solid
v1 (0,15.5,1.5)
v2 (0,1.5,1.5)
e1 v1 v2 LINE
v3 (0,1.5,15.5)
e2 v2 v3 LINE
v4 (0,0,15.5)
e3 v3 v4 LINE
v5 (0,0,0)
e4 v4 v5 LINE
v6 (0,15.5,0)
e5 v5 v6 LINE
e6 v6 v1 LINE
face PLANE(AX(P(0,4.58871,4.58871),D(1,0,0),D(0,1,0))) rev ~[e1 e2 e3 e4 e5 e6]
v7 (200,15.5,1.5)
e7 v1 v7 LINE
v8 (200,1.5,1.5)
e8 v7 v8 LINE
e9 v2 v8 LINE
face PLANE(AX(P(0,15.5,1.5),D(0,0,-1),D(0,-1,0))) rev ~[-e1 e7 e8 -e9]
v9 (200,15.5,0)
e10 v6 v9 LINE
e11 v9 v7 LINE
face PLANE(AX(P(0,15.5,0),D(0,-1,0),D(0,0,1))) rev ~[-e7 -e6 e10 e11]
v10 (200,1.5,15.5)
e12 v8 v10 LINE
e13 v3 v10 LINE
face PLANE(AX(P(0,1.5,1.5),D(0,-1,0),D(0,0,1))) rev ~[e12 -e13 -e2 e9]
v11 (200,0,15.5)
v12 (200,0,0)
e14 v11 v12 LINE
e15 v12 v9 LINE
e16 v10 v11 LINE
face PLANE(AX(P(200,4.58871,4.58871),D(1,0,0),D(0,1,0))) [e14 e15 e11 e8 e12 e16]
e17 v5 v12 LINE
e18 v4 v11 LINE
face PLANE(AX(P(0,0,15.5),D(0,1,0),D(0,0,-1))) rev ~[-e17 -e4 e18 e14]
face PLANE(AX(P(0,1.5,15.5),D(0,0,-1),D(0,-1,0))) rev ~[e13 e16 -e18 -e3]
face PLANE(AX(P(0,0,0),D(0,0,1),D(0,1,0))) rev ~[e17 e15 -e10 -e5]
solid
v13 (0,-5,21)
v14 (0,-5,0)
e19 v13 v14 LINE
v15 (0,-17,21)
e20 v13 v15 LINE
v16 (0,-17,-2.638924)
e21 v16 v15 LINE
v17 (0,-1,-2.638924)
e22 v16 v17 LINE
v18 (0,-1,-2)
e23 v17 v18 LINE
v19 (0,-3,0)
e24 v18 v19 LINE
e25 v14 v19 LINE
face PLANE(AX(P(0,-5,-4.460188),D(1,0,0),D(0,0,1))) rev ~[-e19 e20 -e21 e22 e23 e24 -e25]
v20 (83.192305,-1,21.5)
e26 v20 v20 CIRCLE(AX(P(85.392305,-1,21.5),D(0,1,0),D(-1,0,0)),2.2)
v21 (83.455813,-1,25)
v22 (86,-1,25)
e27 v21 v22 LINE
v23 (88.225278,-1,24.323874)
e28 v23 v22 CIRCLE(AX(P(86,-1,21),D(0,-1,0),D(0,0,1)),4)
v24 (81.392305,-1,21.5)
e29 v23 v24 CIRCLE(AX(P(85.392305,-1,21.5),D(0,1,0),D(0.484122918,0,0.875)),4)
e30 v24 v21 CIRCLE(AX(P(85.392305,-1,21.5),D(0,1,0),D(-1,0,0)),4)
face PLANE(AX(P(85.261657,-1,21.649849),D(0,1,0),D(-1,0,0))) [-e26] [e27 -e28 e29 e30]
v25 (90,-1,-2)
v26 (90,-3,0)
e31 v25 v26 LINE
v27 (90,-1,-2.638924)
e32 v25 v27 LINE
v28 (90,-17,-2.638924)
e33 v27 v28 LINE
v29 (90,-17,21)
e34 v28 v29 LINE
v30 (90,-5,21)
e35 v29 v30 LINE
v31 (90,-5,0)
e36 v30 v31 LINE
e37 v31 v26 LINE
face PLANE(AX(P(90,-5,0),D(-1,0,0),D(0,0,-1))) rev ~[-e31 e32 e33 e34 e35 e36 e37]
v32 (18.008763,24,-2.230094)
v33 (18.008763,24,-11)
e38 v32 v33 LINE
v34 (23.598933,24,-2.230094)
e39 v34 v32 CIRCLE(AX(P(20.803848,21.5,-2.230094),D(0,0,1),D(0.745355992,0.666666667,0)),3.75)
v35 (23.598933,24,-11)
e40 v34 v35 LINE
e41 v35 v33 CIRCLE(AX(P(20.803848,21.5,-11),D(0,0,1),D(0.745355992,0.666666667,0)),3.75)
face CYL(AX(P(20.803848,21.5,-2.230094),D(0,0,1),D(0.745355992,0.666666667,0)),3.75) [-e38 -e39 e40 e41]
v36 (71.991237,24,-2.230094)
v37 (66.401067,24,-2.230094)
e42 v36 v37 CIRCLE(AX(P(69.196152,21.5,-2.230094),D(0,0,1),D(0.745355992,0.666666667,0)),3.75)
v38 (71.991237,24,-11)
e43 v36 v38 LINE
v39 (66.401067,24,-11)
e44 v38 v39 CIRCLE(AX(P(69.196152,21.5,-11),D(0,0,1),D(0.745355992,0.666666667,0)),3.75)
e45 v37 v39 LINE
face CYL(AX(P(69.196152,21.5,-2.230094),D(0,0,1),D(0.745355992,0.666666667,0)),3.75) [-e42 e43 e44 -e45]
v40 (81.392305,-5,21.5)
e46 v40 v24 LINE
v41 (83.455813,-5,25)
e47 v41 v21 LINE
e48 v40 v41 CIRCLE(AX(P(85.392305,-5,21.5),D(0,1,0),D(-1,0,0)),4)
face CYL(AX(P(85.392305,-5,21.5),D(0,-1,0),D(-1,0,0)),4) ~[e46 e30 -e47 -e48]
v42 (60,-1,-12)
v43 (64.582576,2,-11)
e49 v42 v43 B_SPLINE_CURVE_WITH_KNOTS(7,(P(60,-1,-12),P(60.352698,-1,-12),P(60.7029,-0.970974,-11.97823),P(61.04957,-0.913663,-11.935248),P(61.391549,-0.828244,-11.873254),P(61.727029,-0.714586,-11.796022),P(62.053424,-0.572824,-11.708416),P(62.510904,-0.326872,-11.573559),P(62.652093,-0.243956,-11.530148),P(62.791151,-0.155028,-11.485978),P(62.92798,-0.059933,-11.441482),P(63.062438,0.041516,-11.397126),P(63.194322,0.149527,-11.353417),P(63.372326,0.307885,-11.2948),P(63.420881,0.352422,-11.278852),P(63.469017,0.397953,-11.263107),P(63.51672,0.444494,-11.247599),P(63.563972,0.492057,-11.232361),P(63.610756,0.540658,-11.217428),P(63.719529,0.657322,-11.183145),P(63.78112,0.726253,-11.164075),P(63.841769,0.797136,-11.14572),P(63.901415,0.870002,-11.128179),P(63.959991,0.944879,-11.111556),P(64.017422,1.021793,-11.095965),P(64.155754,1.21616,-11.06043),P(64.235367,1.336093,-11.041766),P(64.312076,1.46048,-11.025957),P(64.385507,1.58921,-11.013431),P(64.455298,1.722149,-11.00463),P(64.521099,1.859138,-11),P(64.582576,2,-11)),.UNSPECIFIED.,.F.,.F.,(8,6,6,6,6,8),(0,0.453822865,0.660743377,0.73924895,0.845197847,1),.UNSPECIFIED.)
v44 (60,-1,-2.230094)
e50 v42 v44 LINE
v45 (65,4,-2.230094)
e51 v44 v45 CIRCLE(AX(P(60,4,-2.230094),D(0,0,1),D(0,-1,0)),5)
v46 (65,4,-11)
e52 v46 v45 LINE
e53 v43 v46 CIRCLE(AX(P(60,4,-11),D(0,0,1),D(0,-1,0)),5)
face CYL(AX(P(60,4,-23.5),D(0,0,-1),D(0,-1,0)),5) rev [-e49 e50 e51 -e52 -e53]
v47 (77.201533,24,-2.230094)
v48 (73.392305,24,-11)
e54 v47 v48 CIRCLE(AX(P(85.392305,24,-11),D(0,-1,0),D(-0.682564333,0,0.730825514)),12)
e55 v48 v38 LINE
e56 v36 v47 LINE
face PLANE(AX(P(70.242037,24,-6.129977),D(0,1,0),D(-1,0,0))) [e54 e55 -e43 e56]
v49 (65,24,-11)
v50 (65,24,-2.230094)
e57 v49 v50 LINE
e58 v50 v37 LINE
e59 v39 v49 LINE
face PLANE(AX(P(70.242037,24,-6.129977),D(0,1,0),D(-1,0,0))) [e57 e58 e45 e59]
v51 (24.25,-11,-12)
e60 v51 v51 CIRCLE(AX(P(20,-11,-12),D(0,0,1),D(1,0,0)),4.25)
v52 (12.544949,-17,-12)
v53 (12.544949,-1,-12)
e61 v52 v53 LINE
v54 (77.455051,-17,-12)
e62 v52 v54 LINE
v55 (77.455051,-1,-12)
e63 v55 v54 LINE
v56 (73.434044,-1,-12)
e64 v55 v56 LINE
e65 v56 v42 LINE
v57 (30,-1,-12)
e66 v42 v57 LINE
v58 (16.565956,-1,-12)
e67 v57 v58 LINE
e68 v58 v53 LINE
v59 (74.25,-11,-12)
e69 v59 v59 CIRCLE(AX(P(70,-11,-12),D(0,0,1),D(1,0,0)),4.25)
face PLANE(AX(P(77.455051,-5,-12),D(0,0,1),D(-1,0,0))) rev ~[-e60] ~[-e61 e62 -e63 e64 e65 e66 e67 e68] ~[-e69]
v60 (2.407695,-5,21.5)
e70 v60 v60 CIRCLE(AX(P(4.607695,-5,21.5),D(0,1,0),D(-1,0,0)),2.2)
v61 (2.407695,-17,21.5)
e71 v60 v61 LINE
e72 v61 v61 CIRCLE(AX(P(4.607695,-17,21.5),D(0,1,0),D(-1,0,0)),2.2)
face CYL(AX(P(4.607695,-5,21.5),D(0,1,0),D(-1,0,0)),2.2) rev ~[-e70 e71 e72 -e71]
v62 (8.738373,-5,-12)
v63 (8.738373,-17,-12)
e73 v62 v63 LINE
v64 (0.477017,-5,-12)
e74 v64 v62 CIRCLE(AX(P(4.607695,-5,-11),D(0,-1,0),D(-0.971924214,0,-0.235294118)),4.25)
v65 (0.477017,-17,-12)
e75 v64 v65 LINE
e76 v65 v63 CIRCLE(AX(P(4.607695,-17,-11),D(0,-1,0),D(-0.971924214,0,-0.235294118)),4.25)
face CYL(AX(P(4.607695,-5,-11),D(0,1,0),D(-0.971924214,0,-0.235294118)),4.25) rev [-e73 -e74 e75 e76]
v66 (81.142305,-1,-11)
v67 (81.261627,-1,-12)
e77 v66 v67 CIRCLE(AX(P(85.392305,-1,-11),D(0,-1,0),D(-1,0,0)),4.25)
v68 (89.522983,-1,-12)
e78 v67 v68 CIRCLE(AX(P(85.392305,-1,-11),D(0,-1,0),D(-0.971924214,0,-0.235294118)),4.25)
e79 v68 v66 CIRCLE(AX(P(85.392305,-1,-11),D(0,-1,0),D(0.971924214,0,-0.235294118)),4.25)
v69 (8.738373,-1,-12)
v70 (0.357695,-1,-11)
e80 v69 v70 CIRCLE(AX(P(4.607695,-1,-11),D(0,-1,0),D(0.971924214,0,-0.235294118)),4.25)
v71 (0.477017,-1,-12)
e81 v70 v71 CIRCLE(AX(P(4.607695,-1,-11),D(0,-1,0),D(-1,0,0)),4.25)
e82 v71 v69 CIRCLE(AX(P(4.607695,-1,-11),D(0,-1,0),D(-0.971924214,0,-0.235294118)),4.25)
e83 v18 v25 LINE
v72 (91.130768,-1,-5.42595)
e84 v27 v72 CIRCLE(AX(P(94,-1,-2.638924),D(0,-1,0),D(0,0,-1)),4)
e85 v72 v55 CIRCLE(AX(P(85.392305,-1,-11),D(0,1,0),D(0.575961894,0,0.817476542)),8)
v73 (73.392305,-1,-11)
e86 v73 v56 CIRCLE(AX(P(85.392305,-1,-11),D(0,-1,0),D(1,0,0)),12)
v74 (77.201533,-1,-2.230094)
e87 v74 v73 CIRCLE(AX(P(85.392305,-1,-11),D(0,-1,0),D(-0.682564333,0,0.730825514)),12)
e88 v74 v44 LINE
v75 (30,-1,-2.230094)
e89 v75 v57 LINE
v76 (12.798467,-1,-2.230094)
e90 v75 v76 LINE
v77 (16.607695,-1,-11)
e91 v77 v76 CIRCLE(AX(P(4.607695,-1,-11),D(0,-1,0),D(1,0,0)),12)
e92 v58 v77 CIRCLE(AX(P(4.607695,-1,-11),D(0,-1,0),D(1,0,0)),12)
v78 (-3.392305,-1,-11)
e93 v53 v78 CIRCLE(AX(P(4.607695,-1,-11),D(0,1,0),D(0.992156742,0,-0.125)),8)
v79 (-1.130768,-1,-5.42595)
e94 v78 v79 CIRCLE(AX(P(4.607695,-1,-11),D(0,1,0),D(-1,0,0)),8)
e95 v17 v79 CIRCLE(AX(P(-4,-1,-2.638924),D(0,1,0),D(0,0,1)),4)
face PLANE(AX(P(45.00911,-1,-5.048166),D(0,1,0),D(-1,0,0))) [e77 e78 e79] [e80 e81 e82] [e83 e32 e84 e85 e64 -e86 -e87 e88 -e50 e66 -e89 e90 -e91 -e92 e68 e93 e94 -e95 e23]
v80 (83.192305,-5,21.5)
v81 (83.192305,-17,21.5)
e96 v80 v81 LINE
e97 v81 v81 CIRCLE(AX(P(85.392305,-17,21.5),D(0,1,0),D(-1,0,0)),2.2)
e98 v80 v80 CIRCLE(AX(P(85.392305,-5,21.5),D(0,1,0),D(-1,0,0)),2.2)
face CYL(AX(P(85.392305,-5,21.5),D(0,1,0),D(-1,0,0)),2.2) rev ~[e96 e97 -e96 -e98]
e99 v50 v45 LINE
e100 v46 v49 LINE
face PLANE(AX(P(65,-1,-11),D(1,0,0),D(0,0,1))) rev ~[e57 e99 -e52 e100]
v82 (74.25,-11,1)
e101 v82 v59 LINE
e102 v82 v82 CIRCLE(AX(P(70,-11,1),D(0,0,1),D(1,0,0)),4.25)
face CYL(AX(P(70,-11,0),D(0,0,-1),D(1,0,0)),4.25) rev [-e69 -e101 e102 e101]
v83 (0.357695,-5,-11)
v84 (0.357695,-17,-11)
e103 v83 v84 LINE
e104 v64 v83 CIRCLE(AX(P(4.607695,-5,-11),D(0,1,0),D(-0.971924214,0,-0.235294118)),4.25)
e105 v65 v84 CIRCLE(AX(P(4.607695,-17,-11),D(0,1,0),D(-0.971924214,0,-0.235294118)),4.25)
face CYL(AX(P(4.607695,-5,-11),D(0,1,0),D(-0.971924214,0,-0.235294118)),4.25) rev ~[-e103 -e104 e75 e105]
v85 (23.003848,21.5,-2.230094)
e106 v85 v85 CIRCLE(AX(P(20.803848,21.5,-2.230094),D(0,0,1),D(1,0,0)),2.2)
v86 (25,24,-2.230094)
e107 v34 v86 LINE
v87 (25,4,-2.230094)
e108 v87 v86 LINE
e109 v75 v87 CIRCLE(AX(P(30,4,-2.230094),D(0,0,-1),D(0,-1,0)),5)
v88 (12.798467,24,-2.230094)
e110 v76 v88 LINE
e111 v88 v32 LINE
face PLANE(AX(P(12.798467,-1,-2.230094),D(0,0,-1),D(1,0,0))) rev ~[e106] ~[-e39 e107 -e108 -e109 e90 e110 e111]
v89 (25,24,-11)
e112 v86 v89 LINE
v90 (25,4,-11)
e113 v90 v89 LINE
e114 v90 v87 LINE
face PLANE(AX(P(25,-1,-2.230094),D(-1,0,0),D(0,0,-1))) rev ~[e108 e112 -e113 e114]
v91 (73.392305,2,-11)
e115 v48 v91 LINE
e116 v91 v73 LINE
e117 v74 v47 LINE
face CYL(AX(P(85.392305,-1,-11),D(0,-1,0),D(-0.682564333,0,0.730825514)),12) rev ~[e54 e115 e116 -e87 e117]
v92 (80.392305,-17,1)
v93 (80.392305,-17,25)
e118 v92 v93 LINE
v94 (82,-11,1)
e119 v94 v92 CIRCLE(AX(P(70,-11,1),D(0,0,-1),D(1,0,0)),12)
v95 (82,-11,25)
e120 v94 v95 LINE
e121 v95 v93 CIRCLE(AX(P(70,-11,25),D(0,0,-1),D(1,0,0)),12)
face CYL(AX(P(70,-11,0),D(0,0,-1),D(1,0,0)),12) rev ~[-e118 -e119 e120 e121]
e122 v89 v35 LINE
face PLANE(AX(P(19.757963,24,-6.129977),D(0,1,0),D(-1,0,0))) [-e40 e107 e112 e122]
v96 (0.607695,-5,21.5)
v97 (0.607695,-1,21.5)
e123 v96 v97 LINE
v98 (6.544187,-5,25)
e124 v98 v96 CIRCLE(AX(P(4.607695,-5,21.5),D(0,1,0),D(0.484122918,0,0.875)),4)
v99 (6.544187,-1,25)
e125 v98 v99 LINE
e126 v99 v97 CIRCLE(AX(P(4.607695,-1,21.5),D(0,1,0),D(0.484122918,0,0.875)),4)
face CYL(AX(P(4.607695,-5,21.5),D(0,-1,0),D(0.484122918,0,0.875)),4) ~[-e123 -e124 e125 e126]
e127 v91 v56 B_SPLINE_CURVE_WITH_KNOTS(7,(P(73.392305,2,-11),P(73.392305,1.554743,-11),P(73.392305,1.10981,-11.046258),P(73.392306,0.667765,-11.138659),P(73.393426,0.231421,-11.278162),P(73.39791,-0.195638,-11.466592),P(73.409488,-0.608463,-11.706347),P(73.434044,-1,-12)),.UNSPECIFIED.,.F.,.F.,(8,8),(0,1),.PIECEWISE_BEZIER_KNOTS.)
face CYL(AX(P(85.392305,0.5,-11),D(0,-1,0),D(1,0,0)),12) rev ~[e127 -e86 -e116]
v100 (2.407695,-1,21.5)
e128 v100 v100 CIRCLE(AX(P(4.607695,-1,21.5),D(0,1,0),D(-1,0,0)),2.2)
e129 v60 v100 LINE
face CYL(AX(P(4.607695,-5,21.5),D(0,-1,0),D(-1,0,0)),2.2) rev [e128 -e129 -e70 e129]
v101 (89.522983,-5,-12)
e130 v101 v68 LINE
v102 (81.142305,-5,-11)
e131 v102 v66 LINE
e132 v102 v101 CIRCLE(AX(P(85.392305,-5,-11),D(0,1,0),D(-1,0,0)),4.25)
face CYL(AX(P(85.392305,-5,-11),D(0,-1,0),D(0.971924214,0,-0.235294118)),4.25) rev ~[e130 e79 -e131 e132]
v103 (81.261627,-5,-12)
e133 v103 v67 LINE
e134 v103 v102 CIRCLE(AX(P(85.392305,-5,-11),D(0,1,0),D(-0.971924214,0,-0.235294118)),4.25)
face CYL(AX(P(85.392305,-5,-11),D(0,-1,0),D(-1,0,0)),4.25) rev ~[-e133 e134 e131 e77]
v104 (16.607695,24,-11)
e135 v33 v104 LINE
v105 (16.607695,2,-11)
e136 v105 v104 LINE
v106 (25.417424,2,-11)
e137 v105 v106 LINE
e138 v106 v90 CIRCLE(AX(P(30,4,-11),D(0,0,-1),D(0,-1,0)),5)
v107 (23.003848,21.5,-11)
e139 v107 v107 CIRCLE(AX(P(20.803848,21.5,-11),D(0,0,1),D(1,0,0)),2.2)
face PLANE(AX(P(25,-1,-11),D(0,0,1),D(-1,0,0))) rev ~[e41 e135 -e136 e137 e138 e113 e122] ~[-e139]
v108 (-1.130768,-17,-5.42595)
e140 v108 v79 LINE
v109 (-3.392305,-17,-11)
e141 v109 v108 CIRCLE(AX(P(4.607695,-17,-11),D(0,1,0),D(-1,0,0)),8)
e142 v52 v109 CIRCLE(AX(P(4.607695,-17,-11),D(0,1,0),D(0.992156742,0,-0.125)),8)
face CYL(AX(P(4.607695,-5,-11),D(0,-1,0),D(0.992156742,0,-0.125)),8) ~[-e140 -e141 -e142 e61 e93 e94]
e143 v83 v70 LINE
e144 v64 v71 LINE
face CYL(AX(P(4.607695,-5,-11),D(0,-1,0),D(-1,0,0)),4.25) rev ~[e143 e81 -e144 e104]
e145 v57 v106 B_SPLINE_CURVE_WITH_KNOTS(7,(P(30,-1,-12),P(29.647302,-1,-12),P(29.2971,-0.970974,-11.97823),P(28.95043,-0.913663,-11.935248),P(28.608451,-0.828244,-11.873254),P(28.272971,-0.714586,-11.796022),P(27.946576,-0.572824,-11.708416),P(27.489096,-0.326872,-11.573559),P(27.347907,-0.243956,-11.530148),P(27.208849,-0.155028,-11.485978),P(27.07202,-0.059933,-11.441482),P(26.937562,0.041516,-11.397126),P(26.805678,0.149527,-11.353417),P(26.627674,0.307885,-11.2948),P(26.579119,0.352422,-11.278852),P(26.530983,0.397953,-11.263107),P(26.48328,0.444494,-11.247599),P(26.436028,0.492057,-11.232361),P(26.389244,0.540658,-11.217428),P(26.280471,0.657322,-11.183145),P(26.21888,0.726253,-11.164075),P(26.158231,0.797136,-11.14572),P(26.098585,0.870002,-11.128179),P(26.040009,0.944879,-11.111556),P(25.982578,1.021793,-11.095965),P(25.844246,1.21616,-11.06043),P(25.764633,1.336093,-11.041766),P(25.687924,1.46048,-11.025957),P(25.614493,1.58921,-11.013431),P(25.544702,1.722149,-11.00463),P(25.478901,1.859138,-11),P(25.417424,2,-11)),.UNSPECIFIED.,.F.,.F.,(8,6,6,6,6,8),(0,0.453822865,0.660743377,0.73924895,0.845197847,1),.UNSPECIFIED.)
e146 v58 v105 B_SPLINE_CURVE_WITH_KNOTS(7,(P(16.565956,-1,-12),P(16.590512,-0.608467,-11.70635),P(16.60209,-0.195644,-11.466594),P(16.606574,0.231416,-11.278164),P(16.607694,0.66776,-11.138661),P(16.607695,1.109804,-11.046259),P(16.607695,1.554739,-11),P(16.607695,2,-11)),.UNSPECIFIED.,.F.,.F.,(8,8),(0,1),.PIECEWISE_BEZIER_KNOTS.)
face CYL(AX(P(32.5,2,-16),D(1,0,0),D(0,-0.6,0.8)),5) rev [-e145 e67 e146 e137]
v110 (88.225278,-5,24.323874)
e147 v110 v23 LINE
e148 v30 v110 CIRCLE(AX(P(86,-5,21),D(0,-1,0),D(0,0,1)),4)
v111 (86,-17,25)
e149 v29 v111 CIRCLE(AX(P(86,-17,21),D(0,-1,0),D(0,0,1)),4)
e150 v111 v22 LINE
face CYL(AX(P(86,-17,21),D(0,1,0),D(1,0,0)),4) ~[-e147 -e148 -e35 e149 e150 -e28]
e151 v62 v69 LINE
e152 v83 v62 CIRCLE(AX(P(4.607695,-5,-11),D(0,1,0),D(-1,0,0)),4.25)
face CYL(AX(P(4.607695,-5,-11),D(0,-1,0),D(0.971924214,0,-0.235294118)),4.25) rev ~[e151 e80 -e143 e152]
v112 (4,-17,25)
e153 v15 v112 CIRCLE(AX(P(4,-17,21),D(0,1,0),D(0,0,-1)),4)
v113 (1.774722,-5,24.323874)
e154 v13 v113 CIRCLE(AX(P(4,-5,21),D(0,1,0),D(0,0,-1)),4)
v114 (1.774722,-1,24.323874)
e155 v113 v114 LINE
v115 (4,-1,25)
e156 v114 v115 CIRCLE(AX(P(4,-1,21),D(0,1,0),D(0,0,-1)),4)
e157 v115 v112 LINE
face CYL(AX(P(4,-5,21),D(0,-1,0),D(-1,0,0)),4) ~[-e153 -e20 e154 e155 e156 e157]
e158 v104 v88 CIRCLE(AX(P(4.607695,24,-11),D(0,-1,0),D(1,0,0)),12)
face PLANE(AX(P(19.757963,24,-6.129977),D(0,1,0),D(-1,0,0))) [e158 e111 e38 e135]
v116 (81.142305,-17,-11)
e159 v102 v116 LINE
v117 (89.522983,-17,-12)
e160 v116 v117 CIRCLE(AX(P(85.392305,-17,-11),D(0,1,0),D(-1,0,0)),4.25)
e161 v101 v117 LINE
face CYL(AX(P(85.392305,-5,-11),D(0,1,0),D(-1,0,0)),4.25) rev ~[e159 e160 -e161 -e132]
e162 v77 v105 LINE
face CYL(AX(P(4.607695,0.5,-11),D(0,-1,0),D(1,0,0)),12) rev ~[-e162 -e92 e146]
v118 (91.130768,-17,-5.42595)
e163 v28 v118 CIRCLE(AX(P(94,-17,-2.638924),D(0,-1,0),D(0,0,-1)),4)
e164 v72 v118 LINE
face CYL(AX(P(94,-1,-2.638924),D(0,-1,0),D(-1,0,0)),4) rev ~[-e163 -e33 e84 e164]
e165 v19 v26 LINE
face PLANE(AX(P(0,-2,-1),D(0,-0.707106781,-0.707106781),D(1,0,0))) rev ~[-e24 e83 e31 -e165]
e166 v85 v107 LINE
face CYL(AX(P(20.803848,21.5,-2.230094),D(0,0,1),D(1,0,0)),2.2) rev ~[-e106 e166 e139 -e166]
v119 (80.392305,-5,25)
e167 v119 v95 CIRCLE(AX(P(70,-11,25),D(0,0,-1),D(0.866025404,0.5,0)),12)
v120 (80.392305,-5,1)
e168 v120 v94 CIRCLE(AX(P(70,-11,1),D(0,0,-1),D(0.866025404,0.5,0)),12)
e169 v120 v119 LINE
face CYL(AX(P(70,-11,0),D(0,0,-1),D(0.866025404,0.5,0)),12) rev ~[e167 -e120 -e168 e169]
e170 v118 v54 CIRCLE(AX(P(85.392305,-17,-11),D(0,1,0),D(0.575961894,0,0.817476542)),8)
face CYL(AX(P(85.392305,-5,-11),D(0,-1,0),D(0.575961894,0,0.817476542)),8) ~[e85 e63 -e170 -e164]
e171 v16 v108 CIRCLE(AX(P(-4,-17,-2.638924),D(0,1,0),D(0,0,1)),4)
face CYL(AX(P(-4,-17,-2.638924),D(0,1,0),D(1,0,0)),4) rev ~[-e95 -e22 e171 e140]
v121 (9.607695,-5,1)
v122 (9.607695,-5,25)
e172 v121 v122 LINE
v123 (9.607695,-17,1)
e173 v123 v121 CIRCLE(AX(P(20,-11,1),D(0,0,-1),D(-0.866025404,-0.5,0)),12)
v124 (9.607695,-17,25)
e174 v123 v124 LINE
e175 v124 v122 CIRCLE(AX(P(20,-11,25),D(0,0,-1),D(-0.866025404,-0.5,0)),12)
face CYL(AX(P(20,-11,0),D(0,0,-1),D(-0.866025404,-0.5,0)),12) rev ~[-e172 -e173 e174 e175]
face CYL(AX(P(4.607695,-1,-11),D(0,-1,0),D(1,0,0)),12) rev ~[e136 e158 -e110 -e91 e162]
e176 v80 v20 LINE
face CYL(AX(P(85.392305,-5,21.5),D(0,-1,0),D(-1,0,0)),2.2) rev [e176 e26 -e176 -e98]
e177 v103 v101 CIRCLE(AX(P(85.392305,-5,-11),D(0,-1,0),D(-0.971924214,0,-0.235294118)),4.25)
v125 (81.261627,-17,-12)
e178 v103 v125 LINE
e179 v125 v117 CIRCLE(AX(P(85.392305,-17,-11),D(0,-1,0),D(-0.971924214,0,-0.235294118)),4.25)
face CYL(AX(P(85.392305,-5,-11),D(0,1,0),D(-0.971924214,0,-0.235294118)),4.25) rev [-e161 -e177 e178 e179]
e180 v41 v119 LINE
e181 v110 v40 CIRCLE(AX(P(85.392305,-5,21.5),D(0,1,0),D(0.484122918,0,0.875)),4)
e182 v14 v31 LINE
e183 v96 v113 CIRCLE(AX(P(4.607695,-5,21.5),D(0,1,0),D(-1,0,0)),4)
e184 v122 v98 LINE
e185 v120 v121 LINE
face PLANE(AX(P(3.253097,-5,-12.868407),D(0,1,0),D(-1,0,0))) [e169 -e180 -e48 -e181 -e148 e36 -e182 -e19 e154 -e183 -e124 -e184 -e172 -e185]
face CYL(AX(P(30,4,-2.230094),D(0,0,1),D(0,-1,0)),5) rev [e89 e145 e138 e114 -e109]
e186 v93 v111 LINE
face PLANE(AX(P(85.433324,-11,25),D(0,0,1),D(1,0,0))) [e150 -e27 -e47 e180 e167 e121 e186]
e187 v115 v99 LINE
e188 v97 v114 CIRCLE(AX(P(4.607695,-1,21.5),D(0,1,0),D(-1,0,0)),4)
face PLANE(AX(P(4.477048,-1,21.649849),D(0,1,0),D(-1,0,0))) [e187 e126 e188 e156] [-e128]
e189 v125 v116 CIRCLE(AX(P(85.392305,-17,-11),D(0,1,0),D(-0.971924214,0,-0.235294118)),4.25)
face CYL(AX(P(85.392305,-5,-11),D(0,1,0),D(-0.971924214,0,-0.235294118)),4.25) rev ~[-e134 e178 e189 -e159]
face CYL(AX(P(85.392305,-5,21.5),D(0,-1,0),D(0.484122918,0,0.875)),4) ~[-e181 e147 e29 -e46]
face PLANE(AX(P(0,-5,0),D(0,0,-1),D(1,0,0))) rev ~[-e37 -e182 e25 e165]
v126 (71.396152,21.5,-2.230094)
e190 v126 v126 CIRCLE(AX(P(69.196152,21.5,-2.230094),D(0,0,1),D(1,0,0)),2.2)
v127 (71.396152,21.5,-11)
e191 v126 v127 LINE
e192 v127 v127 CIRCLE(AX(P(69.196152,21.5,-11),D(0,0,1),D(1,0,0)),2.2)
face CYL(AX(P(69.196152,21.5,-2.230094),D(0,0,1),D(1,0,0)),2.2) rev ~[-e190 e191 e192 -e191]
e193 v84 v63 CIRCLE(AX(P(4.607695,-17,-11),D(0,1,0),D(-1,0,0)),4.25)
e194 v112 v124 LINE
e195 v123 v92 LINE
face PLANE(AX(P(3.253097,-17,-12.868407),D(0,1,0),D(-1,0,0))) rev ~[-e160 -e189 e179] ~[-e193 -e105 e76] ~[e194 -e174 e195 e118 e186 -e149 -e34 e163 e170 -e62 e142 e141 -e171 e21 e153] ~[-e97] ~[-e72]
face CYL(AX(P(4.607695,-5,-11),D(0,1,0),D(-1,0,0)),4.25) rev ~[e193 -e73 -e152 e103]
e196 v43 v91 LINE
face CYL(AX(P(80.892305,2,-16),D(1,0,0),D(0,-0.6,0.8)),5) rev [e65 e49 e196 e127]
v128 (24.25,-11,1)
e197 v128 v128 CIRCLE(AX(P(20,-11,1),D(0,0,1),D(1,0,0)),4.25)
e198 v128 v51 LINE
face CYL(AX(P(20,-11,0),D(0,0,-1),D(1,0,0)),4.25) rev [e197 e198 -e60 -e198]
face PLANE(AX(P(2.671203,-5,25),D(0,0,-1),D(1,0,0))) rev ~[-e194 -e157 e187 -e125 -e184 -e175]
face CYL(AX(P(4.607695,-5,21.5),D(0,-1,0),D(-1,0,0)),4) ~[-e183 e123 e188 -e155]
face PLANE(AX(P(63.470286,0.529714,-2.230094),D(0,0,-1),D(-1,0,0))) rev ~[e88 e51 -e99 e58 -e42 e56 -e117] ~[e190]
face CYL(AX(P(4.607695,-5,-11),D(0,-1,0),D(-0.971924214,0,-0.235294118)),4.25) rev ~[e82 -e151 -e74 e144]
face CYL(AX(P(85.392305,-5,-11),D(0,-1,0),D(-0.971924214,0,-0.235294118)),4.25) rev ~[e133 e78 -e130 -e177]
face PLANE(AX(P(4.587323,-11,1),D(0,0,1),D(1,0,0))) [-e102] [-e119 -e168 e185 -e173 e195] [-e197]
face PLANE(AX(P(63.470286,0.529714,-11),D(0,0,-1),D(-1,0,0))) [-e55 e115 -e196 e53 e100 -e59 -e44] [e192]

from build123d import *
from build123d import SkipClean  # not in build123d's __all__

# Parameters (mm, degrees)
F1_DEPTH      = 200
F2_R          = 4.25
F3_DEPTH      = 12
F3_DEPTH_BACK = 1
F4_DEPTH      = 25
F5_R          = 2.2
F6_DEPTH      = 25
F7_DEPTH      = 4
F8_DEPTH      = 12
F9_DEPTH      = 25
F10_DEPTH     = 4
F12_DEPTH     = 25
F14_DEPTH     = 8.7699061669
F13_R         = 2.2
F15_DEPTH     = 25
F16_T1_DEPTH  = 8.7699061669
F16_T6_DEPTH  = 15.8923048454
F16_S7_R      = 12
F16_T8_DEPTH  = 10
F16_T12_DEPTH = 15.8923048454
F16_S13_R     = 12
F16_T14_DEPTH = 10
F16_T19_DEPTH = 23.3923048454
F16_T23_DEPTH = 21.2699061669
F16_T31_DEPTH = 21.2699061669
F16_T36_DEPTH = 23.3923048454
F17_SIZE      = 2
F18_R         = 4


# Not quite as in the source:
# - a fillet or chamfer that OpenCascade refuses, or shapes differently, is made with other operations: its cross-section is extruded or revolved along the edge and cut away or added


with BuildPart() as f1:
    # F0 (on Right) → F1 (new body)
    with BuildSketch(Plane.YZ):
        Polygon((0, 15.5), (0, 0), (15.5, 0), (15.5, 1.5), (1.5, 1.5), (1.5, 15.5), align=None)
    extrude(amount=F1_DEPTH)


with BuildPart() as f3:
    # F2 (on Top) → F3 (new body, two sides)
    with BuildSketch(Plane.XY) as f3_sk:
        with BuildLine():
            Line((9.6076951546, -5), (0, -5))
            Line((0, -5), (0, -17))
            Line((0, -17), (9.6076951546, -17))
            ThreePointArc((9.6076951546, -17), (8, -11), (9.6076951546, -5))
        make_face()
        with BuildLine():
            Line((59.6076951546, -5), (30.3923048454, -5))
            ThreePointArc((30.3923048454, -5), (31.5911099155, -7.8941714588), (32, -11))
            ThreePointArc((32, -11), (31.5911099155, -14.1058285412), (30.3923048454, -17))
            Line((30.3923048454, -17), (59.6076951546, -17))
            ThreePointArc((59.6076951546, -17), (58, -11), (59.6076951546, -5))
        make_face()
        with BuildLine():
            Line((90, -5), (80.3923048454, -5))
            ThreePointArc((80.3923048454, -5), (81.5911099155, -7.8941714588), (82, -11))
            ThreePointArc((82, -11), (81.5911099155, -14.1058285412), (80.3923048454, -17))
            Line((80.3923048454, -17), (90, -17))
            Line((90, -17), (90, -5))
        make_face()
        with BuildLine():
            Line((30.3923048454, -5), (9.6076951546, -5))
            ThreePointArc((9.6076951546, -5), (8, -11), (9.6076951546, -17))
            Line((9.6076951546, -17), (30.3923048454, -17))
            ThreePointArc((30.3923048454, -17), (31.5911099155, -14.1058285412), (32, -11))
            ThreePointArc((32, -11), (31.5911099155, -7.8941714588), (30.3923048454, -5))
        make_face()
        with Locations((20, -11)):
            Circle(F2_R, mode=Mode.SUBTRACT)
        with BuildLine():
            Line((80.3923048454, -5), (59.6076951546, -5))
            ThreePointArc((59.6076951546, -5), (58, -11), (59.6076951546, -17))
            Line((59.6076951546, -17), (80.3923048454, -17))
            ThreePointArc((80.3923048454, -17), (81.5911099155, -14.1058285412), (82, -11))
            ThreePointArc((82, -11), (81.5911099155, -7.8941714588), (80.3923048454, -5))
        make_face()
        with Locations((70, -11)):
            Circle(F2_R, mode=Mode.SUBTRACT)
    extrude(amount=-F3_DEPTH)
    extrude(f3_sk.sketch, amount=F3_DEPTH_BACK)

    # F2 (on Top) → F4 (join)
    with BuildSketch(Plane.XY):
        with BuildLine():
            Line((9.6076951546, -5), (0, -5))
            Line((0, -5), (0, -17))
            Line((0, -17), (9.6076951546, -17))
            ThreePointArc((9.6076951546, -17), (8, -11), (9.6076951546, -5))
        make_face()
        with BuildLine():
            Line((90, -5), (80.3923048454, -5))
            ThreePointArc((80.3923048454, -5), (81.5911099155, -7.8941714588), (82, -11))
            ThreePointArc((82, -11), (81.5911099155, -14.1058285412), (80.3923048454, -17))
            Line((80.3923048454, -17), (90, -17))
            Line((90, -17), (90, -5))
        make_face()
    extrude(amount=F4_DEPTH)

    # F5 (on face) → F6 (cut)
    with BuildSketch(Plane(origin=(0, -5, 0), x_dir=(-1, 0, 0), z_dir=(0, 1, 0))):
        with Locations((-4.6076951546, 21.5)):
            Circle(F5_R)
        with Locations((-85.3923048454, 21.5)):
            Circle(F5_R)
    extrude(amount=-F6_DEPTH, mode=Mode.SUBTRACT)

    # F5 (on face) → F7 (join)
    with BuildSketch(Plane(origin=(0, -5, 0), x_dir=(-1, 0, 0), z_dir=(0, 1, 0))):
        with BuildLine():
            ThreePointArc((-0.6076951546, 21.5), (-1.1619755859, 23.5315060063), (-2.6712034815, 25))
            Line((-2.6712034815, 25), (-6.5441868277, 25))
            ThreePointArc((-6.5441868277, 25), (-6.6392011609, 18.0542804313), (-0.6076951546, 21.5))
        make_face()
        with Locations((-4.6076951546, 21.5)):
            Circle(F5_R, mode=Mode.SUBTRACT)
        with BuildLine():
            ThreePointArc((-81.3923048454, 21.5), (-81.9465852767, 23.5315060063), (-83.4558131723, 25))
            Line((-83.4558131723, 25), (-87.3287965185, 25))
            ThreePointArc((-87.3287965185, 25), (-87.4238108518, 18.0542804313), (-81.3923048454, 21.5))
        make_face()
        with Locations((-85.3923048454, 21.5)):
            Circle(F5_R, mode=Mode.SUBTRACT)
    extrude(amount=F7_DEPTH)

    # F5 (on face) → F8 (join, through all)
    with BuildSketch(Plane(origin=(0, -5, 0), x_dir=(-1, 0, 0), z_dir=(0, 1, 0))):
        with BuildLine():
            ThreePointArc((3.3923048454, -11), (2.4937681185, -7.3163578646), (0, -4.4601876661))
            Line((0, -4.4601876661), (0, -12))
            Line((0, -12), (-0.4770172441, -12))
            ThreePointArc((-0.4770172441, -12), (-4.6076951546, -15.25), (-8.7383730651, -12))
            Line((-8.7383730651, -12), (-12.5449490878, -12))
            ThreePointArc((-12.5449490878, -12), (-4.1067118542, -18.9842980739), (3.3923048454, -11))
        make_face()
        with BuildLine():
            Line((-90, -12), (-90, -4.4601876661))
            ThreePointArc((-90, -4.4601876661), (-89.5134312597, -17.8568445423), (-77.4550509122, -12))
            Line((-77.4550509122, -12), (-81.2616269349, -12))
            ThreePointArc((-81.2616269349, -12), (-85.3923048454, -15.25), (-89.5229827559, -12))
            Line((-89.5229827559, -12), (-90, -12))
        make_face()
        with BuildLine():
            ThreePointArc((-77.3923048454, -11), (-81.70866271, -3.898536727), (-90, -4.4601876661))
            Line((-90, -4.4601876661), (-90, -12))
            Line((-90, -12), (-89.5229827559, -12))
            ThreePointArc((-89.5229827559, -12), (-85.8958517055, -6.7799359531), (-81.1423048454, -11))
            ThreePointArc((-81.1423048454, -11), (-81.1722407985, -11.50354686), (-81.2616269349, -12))
            Line((-81.2616269349, -12), (-77.4550509122, -12))
            ThreePointArc((-77.4550509122, -12), (-77.4080067715, -11.5009833003), (-77.3923048454, -11))
        make_face()
    extrude(amount=-F8_DEPTH)

    # F5 (on face) → F9 (cut)
    with BuildSketch(Plane(origin=(0, -5, 0), x_dir=(-1, 0, 0), z_dir=(0, 1, 0))):
        with BuildLine():
            Line((-89.5229827559, -12), (-81.2616269349, -12))
            ThreePointArc((-81.2616269349, -12), (-81.1722407985, -11.50354686), (-81.1423048454, -11))
            ThreePointArc((-81.1423048454, -11), (-85.8958517055, -6.7799359531), (-89.5229827559, -12))
        make_face()
        with BuildLine():
            ThreePointArc((-0.3576951546, -11), (-5.1112420146, -6.7799359531), (-8.7383730651, -12))
            Line((-8.7383730651, -12), (-0.4770172441, -12))
            ThreePointArc((-0.4770172441, -12), (-0.3876311077, -11.50354686), (-0.3576951546, -11))
        make_face()
    with SkipClean():  # cleaning this boolean's faces spoils the solid; the shape is the same uncleaned
        extrude(amount=-F9_DEPTH, mode=Mode.SUBTRACT)

    # F5 (on face) → F10 (join)
    with BuildSketch(Plane(origin=(0, -5, 0), x_dir=(-1, 0, 0), z_dir=(0, 1, 0))):
        with BuildLine():
            Line((0, -4.4601876661), (0, 0))
            Line((0, 0), (-90, 0))
            Line((-90, 0), (-90, -4.4601876661))
            ThreePointArc((-90, -4.4601876661), (-81.70866271, -3.898536727), (-77.3923048454, -11))
            ThreePointArc((-77.3923048454, -11), (-77.4080067715, -11.5009833003), (-77.4550509122, -12))
            Line((-77.4550509122, -12), (-12.5449490878, -12))
            ThreePointArc((-12.5449490878, -12), (-8.7288215689, -4.1431554577), (0, -4.4601876661))
        make_face()
        with BuildLine():
            ThreePointArc((-77.3923048454, -11), (-81.70866271, -3.898536727), (-90, -4.4601876661))
            Line((-90, -4.4601876661), (-90, -12))
            Line((-90, -12), (-89.5229827559, -12))
            ThreePointArc((-89.5229827559, -12), (-85.8958517055, -6.7799359531), (-81.1423048454, -11))
            ThreePointArc((-81.1423048454, -11), (-81.1722407985, -11.50354686), (-81.2616269349, -12))
            Line((-81.2616269349, -12), (-77.4550509122, -12))
            ThreePointArc((-77.4550509122, -12), (-77.4080067715, -11.5009833003), (-77.3923048454, -11))
        make_face()
        with BuildLine():
            Line((-90, -12), (-90, -4.4601876661))
            ThreePointArc((-90, -4.4601876661), (-89.5134312597, -17.8568445423), (-77.4550509122, -12))
            Line((-77.4550509122, -12), (-81.2616269349, -12))
            ThreePointArc((-81.2616269349, -12), (-85.3923048454, -15.25), (-89.5229827559, -12))
            Line((-89.5229827559, -12), (-90, -12))
        make_face()
        with BuildLine():
            Line((0, -12), (0, -4.4601876661))
            ThreePointArc((0, -4.4601876661), (-8.7288215689, -4.1431554577), (-12.5449490878, -12))
            Line((-12.5449490878, -12), (-8.7383730651, -12))
            ThreePointArc((-8.7383730651, -12), (-5.1112420146, -6.7799359531), (-0.3576951546, -11))
            ThreePointArc((-0.3576951546, -11), (-0.3876311077, -11.50354686), (-0.4770172441, -12))
            Line((-0.4770172441, -12), (0, -12))
        make_face()
        with BuildLine():
            ThreePointArc((3.3923048454, -11), (2.4937681185, -7.3163578646), (0, -4.4601876661))
            Line((0, -4.4601876661), (0, -12))
            Line((0, -12), (-0.4770172441, -12))
            ThreePointArc((-0.4770172441, -12), (-4.6076951546, -15.25), (-8.7383730651, -12))
            Line((-8.7383730651, -12), (-12.5449490878, -12))
            ThreePointArc((-12.5449490878, -12), (-4.1067118542, -18.9842980739), (3.3923048454, -11))
        make_face()
    with SkipClean():  # cleaning this boolean's faces spoils the solid; the shape is the same uncleaned
        extrude(amount=F10_DEPTH)

    # F11 (on face) → F12 (join)
    with BuildSketch(Plane(origin=(0, -1, 0), x_dir=(-1, 0, 0), z_dir=(0, 1, 0))):
        with BuildLine():
            ThreePointArc((-77.2015328535, -2.2300938331), (-74.3857326292, -6.2192711802), (-73.3923048454, -11))
            Line((-73.3923048454, -11), (-65, -11))
            Line((-65, -11), (-65, -2.2300938331))
            Line((-65, -2.2300938331), (-77.2015328535, -2.2300938331))
        make_face()
        with BuildLine():
            Line((-25, -2.2300938331), (-25, -11))
            Line((-25, -11), (-16.6076951546, -11))
            ThreePointArc((-16.6076951546, -11), (-15.6142673708, -6.2192711802), (-12.7984671465, -2.2300938331))
            Line((-12.7984671465, -2.2300938331), (-25, -2.2300938331))
        make_face()
    extrude(amount=F12_DEPTH)

    # F13 (on face) → F14 (join, through all)
    with BuildSketch(Plane.XY.offset(-2.2300938331)):
        with BuildLine():
            Line((65, 15.5), (73.3923048454, 15.5))
            Line((73.3923048454, 15.5), (73.3923048454, 24))
            Line((73.3923048454, 24), (71.9912373946, 24))
            ThreePointArc((71.9912373946, 24), (72.6992987688, 22.8380828366), (72.9461524227, 21.5))
            ThreePointArc((72.9461524227, 21.5), (67.8580695861, 17.9968536539), (66.4010674508, 24))
            Line((66.4010674508, 24), (65, 24))
            Line((65, 24), (65, 15.5))
        make_face()
        with BuildLine():
            Line((66.4010674508, 24), (71.9912373946, 24))
            ThreePointArc((71.9912373946, 24), (69.1961524227, 25.25), (66.4010674508, 24))
        make_face()
        with BuildLine():
            Line((18.0087626054, 24), (23.5989325492, 24))
            ThreePointArc((23.5989325492, 24), (20.8038475773, 25.25), (18.0087626054, 24))
        make_face()
    extrude(amount=-F14_DEPTH)

    # F13 (on face) → F15 (cut)
    with BuildSketch(Plane.XY.offset(-2.2300938331)):
        with Locations((20.8038475773, 21.5)):
            Circle(F13_R)
        with Locations((69.1961524227, 21.5)):
            Circle(F13_R)
    extrude(amount=-F15_DEPTH, mode=Mode.SUBTRACT)

    # F16: fillet of radius 5 on 4 edges, made by hand

    # F16_s2 → F16_t1 (join)
    with BuildSketch(Plane.XY.offset(-11)):
        with BuildLine():
            ThreePointArc((60, -1), (63.5355339059, 0.4644660941), (65, 4))
            Line((65, 4), (65, -1))
            Line((65, -1), (60, -1))
        make_face()
        with BuildLine():
            ThreePointArc((30, -1), (26.4644660941, 0.4644660941), (25, 4))
            Line((25, 4), (25, -1))
            Line((25, -1), (30, -1))
        make_face()
    extrude(amount=F16_T1_DEPTH)


with BuildPart() as f16_tool4:
    # F16_s5 → F16_t6 (new body)
    with BuildSketch(Plane.YZ.offset(80.8923048454)):
        with BuildLine():
            ThreePointArc((-1, -12), (0.4188611699, -11.2565835097), (2, -11))
            Line((2, -11), (-1, -11))
            Line((-1, -11), (-1, -12))
        make_face()
    extrude(amount=-F16_T6_DEPTH)

    # F16_s7 → F16_t8 (cut, symmetric)
    with BuildSketch(Plane.XZ.offset(-0.5)):
        with Locations((85.3923048454, -11)):
            Circle(F16_S7_R)
    extrude(amount=F16_T8_DEPTH, both=True, mode=Mode.SUBTRACT)


with BuildPart() as f3_1:
    add(f3.part, clean=False)

    # F16_t3: union F16_tool4
    add(f16_tool4.part)


with BuildPart() as f16_tool10:
    # F16_s11 → F16_t12 (new body)
    with BuildSketch(Plane.YZ.offset(25)):
        with BuildLine():
            ThreePointArc((-1, -12), (0.4188611699, -11.2565835097), (2, -11))
            Line((2, -11), (-1, -11))
            Line((-1, -11), (-1, -12))
        make_face()
    extrude(amount=-F16_T12_DEPTH)

    # F16_s13 → F16_t14 (cut, symmetric)
    with BuildSketch(Plane.XZ.offset(-0.5)):
        with Locations((4.6076951546, -11)):
            Circle(F16_S13_R)
    extrude(amount=F16_T14_DEPTH, both=True, mode=Mode.SUBTRACT)


with BuildPart() as f3_2:
    add(f3_1.part, clean=False)

    # F16_t9: union F16_tool10
    add(f16_tool10.part)


with BuildPart() as f16_tool17:
    # F16_s18 → F16_t19 (new body)
    with BuildSketch(Plane.YZ.offset(80.8923048454)):
        with BuildLine():
            ThreePointArc((-1, -12), (0.4188611699, -11.2565835097), (2, -11))
            Line((2, -11), (-1, -11))
            Line((-1, -11), (-1, -12))
        make_face()
    extrude(amount=-F16_T19_DEPTH)

    split(bisect_by=Plane.YZ.offset(65), keep=Keep.BOTTOM)


with BuildPart() as f16_tool21:
    # F16_s22 → F16_t23 (new body)
    with BuildSketch(Plane.XY.offset(-23.5)):
        with BuildLine():
            ThreePointArc((60, -1), (63.5355339059, 0.4644660941), (65, 4))
            Line((65, 4), (65, -1))
            Line((65, -1), (60, -1))
        make_face()
    extrude(amount=F16_T23_DEPTH)

    split(bisect_by=Plane.XY.offset(-12), keep=Keep.TOP)

    split(bisect_by=Plane.XY.offset(-11), keep=Keep.BOTTOM)


with BuildPart() as f16_tool17_1:
    add(f16_tool17.part, clean=False)

    # F16_t26: intersect F16_tool21
    add(f16_tool21.part, mode=Mode.INTERSECT)


with BuildPart() as f3_3:
    add(f3_2.part, clean=False)

    # F16_t15: union F16_tool17
    add(f16_tool17_1.part)


with BuildPart() as f16_tool29:
    # F16_s30 → F16_t31 (new body)
    with BuildSketch(Plane.XY.offset(-2.2300938331)):
        with BuildLine():
            ThreePointArc((30, -1), (26.4644660941, 0.4644660941), (25, 4))
            Line((25, 4), (25, -1))
            Line((25, -1), (30, -1))
        make_face()
    extrude(amount=-F16_T31_DEPTH)

    split(bisect_by=Plane.XY.offset(-12), keep=Keep.TOP)

    split(bisect_by=Plane.XY.offset(-11), keep=Keep.BOTTOM)


with BuildPart() as f16_tool34:
    # F16_s35 → F16_t36 (new body)
    with BuildSketch(Plane.YZ.offset(32.5)):
        with BuildLine():
            ThreePointArc((-1, -12), (0.4188611699, -11.2565835097), (2, -11))
            Line((2, -11), (-1, -11))
            Line((-1, -11), (-1, -12))
        make_face()
    extrude(amount=-F16_T36_DEPTH)

    split(bisect_by=Plane.YZ.offset(25), keep=Keep.TOP)


with BuildPart() as f16_tool29_1:
    add(f16_tool29.part, clean=False)

    # F16_t38: intersect F16_tool34
    add(f16_tool34.part, mode=Mode.INTERSECT)


with BuildPart() as f3_4:
    add(f3_3.part, clean=False)

    # F16_t27: union F16_tool29
    add(f16_tool29_1.part)

    # F17
    f17_edges = [f3_4.edges().sort_by_distance(p)[0] for p in [
        (45, -1, 0),
    ]]
    chamfer(f17_edges, length=F17_SIZE)

    # F18
    f18_edges = [f3_4.edges().sort_by_distance(p)[0] for p in [
        (0, -11, -4.460188),
        (0, -3, -4.460188),
        (90, -3, -4.460188),
        (90, -11, 25),
        (0, -11, 25),
        (90, -11, -4.460188),
    ]]
    fillet(f18_edges, radius=F18_R)


solid = Compound([f1.part, f3_4.part])
